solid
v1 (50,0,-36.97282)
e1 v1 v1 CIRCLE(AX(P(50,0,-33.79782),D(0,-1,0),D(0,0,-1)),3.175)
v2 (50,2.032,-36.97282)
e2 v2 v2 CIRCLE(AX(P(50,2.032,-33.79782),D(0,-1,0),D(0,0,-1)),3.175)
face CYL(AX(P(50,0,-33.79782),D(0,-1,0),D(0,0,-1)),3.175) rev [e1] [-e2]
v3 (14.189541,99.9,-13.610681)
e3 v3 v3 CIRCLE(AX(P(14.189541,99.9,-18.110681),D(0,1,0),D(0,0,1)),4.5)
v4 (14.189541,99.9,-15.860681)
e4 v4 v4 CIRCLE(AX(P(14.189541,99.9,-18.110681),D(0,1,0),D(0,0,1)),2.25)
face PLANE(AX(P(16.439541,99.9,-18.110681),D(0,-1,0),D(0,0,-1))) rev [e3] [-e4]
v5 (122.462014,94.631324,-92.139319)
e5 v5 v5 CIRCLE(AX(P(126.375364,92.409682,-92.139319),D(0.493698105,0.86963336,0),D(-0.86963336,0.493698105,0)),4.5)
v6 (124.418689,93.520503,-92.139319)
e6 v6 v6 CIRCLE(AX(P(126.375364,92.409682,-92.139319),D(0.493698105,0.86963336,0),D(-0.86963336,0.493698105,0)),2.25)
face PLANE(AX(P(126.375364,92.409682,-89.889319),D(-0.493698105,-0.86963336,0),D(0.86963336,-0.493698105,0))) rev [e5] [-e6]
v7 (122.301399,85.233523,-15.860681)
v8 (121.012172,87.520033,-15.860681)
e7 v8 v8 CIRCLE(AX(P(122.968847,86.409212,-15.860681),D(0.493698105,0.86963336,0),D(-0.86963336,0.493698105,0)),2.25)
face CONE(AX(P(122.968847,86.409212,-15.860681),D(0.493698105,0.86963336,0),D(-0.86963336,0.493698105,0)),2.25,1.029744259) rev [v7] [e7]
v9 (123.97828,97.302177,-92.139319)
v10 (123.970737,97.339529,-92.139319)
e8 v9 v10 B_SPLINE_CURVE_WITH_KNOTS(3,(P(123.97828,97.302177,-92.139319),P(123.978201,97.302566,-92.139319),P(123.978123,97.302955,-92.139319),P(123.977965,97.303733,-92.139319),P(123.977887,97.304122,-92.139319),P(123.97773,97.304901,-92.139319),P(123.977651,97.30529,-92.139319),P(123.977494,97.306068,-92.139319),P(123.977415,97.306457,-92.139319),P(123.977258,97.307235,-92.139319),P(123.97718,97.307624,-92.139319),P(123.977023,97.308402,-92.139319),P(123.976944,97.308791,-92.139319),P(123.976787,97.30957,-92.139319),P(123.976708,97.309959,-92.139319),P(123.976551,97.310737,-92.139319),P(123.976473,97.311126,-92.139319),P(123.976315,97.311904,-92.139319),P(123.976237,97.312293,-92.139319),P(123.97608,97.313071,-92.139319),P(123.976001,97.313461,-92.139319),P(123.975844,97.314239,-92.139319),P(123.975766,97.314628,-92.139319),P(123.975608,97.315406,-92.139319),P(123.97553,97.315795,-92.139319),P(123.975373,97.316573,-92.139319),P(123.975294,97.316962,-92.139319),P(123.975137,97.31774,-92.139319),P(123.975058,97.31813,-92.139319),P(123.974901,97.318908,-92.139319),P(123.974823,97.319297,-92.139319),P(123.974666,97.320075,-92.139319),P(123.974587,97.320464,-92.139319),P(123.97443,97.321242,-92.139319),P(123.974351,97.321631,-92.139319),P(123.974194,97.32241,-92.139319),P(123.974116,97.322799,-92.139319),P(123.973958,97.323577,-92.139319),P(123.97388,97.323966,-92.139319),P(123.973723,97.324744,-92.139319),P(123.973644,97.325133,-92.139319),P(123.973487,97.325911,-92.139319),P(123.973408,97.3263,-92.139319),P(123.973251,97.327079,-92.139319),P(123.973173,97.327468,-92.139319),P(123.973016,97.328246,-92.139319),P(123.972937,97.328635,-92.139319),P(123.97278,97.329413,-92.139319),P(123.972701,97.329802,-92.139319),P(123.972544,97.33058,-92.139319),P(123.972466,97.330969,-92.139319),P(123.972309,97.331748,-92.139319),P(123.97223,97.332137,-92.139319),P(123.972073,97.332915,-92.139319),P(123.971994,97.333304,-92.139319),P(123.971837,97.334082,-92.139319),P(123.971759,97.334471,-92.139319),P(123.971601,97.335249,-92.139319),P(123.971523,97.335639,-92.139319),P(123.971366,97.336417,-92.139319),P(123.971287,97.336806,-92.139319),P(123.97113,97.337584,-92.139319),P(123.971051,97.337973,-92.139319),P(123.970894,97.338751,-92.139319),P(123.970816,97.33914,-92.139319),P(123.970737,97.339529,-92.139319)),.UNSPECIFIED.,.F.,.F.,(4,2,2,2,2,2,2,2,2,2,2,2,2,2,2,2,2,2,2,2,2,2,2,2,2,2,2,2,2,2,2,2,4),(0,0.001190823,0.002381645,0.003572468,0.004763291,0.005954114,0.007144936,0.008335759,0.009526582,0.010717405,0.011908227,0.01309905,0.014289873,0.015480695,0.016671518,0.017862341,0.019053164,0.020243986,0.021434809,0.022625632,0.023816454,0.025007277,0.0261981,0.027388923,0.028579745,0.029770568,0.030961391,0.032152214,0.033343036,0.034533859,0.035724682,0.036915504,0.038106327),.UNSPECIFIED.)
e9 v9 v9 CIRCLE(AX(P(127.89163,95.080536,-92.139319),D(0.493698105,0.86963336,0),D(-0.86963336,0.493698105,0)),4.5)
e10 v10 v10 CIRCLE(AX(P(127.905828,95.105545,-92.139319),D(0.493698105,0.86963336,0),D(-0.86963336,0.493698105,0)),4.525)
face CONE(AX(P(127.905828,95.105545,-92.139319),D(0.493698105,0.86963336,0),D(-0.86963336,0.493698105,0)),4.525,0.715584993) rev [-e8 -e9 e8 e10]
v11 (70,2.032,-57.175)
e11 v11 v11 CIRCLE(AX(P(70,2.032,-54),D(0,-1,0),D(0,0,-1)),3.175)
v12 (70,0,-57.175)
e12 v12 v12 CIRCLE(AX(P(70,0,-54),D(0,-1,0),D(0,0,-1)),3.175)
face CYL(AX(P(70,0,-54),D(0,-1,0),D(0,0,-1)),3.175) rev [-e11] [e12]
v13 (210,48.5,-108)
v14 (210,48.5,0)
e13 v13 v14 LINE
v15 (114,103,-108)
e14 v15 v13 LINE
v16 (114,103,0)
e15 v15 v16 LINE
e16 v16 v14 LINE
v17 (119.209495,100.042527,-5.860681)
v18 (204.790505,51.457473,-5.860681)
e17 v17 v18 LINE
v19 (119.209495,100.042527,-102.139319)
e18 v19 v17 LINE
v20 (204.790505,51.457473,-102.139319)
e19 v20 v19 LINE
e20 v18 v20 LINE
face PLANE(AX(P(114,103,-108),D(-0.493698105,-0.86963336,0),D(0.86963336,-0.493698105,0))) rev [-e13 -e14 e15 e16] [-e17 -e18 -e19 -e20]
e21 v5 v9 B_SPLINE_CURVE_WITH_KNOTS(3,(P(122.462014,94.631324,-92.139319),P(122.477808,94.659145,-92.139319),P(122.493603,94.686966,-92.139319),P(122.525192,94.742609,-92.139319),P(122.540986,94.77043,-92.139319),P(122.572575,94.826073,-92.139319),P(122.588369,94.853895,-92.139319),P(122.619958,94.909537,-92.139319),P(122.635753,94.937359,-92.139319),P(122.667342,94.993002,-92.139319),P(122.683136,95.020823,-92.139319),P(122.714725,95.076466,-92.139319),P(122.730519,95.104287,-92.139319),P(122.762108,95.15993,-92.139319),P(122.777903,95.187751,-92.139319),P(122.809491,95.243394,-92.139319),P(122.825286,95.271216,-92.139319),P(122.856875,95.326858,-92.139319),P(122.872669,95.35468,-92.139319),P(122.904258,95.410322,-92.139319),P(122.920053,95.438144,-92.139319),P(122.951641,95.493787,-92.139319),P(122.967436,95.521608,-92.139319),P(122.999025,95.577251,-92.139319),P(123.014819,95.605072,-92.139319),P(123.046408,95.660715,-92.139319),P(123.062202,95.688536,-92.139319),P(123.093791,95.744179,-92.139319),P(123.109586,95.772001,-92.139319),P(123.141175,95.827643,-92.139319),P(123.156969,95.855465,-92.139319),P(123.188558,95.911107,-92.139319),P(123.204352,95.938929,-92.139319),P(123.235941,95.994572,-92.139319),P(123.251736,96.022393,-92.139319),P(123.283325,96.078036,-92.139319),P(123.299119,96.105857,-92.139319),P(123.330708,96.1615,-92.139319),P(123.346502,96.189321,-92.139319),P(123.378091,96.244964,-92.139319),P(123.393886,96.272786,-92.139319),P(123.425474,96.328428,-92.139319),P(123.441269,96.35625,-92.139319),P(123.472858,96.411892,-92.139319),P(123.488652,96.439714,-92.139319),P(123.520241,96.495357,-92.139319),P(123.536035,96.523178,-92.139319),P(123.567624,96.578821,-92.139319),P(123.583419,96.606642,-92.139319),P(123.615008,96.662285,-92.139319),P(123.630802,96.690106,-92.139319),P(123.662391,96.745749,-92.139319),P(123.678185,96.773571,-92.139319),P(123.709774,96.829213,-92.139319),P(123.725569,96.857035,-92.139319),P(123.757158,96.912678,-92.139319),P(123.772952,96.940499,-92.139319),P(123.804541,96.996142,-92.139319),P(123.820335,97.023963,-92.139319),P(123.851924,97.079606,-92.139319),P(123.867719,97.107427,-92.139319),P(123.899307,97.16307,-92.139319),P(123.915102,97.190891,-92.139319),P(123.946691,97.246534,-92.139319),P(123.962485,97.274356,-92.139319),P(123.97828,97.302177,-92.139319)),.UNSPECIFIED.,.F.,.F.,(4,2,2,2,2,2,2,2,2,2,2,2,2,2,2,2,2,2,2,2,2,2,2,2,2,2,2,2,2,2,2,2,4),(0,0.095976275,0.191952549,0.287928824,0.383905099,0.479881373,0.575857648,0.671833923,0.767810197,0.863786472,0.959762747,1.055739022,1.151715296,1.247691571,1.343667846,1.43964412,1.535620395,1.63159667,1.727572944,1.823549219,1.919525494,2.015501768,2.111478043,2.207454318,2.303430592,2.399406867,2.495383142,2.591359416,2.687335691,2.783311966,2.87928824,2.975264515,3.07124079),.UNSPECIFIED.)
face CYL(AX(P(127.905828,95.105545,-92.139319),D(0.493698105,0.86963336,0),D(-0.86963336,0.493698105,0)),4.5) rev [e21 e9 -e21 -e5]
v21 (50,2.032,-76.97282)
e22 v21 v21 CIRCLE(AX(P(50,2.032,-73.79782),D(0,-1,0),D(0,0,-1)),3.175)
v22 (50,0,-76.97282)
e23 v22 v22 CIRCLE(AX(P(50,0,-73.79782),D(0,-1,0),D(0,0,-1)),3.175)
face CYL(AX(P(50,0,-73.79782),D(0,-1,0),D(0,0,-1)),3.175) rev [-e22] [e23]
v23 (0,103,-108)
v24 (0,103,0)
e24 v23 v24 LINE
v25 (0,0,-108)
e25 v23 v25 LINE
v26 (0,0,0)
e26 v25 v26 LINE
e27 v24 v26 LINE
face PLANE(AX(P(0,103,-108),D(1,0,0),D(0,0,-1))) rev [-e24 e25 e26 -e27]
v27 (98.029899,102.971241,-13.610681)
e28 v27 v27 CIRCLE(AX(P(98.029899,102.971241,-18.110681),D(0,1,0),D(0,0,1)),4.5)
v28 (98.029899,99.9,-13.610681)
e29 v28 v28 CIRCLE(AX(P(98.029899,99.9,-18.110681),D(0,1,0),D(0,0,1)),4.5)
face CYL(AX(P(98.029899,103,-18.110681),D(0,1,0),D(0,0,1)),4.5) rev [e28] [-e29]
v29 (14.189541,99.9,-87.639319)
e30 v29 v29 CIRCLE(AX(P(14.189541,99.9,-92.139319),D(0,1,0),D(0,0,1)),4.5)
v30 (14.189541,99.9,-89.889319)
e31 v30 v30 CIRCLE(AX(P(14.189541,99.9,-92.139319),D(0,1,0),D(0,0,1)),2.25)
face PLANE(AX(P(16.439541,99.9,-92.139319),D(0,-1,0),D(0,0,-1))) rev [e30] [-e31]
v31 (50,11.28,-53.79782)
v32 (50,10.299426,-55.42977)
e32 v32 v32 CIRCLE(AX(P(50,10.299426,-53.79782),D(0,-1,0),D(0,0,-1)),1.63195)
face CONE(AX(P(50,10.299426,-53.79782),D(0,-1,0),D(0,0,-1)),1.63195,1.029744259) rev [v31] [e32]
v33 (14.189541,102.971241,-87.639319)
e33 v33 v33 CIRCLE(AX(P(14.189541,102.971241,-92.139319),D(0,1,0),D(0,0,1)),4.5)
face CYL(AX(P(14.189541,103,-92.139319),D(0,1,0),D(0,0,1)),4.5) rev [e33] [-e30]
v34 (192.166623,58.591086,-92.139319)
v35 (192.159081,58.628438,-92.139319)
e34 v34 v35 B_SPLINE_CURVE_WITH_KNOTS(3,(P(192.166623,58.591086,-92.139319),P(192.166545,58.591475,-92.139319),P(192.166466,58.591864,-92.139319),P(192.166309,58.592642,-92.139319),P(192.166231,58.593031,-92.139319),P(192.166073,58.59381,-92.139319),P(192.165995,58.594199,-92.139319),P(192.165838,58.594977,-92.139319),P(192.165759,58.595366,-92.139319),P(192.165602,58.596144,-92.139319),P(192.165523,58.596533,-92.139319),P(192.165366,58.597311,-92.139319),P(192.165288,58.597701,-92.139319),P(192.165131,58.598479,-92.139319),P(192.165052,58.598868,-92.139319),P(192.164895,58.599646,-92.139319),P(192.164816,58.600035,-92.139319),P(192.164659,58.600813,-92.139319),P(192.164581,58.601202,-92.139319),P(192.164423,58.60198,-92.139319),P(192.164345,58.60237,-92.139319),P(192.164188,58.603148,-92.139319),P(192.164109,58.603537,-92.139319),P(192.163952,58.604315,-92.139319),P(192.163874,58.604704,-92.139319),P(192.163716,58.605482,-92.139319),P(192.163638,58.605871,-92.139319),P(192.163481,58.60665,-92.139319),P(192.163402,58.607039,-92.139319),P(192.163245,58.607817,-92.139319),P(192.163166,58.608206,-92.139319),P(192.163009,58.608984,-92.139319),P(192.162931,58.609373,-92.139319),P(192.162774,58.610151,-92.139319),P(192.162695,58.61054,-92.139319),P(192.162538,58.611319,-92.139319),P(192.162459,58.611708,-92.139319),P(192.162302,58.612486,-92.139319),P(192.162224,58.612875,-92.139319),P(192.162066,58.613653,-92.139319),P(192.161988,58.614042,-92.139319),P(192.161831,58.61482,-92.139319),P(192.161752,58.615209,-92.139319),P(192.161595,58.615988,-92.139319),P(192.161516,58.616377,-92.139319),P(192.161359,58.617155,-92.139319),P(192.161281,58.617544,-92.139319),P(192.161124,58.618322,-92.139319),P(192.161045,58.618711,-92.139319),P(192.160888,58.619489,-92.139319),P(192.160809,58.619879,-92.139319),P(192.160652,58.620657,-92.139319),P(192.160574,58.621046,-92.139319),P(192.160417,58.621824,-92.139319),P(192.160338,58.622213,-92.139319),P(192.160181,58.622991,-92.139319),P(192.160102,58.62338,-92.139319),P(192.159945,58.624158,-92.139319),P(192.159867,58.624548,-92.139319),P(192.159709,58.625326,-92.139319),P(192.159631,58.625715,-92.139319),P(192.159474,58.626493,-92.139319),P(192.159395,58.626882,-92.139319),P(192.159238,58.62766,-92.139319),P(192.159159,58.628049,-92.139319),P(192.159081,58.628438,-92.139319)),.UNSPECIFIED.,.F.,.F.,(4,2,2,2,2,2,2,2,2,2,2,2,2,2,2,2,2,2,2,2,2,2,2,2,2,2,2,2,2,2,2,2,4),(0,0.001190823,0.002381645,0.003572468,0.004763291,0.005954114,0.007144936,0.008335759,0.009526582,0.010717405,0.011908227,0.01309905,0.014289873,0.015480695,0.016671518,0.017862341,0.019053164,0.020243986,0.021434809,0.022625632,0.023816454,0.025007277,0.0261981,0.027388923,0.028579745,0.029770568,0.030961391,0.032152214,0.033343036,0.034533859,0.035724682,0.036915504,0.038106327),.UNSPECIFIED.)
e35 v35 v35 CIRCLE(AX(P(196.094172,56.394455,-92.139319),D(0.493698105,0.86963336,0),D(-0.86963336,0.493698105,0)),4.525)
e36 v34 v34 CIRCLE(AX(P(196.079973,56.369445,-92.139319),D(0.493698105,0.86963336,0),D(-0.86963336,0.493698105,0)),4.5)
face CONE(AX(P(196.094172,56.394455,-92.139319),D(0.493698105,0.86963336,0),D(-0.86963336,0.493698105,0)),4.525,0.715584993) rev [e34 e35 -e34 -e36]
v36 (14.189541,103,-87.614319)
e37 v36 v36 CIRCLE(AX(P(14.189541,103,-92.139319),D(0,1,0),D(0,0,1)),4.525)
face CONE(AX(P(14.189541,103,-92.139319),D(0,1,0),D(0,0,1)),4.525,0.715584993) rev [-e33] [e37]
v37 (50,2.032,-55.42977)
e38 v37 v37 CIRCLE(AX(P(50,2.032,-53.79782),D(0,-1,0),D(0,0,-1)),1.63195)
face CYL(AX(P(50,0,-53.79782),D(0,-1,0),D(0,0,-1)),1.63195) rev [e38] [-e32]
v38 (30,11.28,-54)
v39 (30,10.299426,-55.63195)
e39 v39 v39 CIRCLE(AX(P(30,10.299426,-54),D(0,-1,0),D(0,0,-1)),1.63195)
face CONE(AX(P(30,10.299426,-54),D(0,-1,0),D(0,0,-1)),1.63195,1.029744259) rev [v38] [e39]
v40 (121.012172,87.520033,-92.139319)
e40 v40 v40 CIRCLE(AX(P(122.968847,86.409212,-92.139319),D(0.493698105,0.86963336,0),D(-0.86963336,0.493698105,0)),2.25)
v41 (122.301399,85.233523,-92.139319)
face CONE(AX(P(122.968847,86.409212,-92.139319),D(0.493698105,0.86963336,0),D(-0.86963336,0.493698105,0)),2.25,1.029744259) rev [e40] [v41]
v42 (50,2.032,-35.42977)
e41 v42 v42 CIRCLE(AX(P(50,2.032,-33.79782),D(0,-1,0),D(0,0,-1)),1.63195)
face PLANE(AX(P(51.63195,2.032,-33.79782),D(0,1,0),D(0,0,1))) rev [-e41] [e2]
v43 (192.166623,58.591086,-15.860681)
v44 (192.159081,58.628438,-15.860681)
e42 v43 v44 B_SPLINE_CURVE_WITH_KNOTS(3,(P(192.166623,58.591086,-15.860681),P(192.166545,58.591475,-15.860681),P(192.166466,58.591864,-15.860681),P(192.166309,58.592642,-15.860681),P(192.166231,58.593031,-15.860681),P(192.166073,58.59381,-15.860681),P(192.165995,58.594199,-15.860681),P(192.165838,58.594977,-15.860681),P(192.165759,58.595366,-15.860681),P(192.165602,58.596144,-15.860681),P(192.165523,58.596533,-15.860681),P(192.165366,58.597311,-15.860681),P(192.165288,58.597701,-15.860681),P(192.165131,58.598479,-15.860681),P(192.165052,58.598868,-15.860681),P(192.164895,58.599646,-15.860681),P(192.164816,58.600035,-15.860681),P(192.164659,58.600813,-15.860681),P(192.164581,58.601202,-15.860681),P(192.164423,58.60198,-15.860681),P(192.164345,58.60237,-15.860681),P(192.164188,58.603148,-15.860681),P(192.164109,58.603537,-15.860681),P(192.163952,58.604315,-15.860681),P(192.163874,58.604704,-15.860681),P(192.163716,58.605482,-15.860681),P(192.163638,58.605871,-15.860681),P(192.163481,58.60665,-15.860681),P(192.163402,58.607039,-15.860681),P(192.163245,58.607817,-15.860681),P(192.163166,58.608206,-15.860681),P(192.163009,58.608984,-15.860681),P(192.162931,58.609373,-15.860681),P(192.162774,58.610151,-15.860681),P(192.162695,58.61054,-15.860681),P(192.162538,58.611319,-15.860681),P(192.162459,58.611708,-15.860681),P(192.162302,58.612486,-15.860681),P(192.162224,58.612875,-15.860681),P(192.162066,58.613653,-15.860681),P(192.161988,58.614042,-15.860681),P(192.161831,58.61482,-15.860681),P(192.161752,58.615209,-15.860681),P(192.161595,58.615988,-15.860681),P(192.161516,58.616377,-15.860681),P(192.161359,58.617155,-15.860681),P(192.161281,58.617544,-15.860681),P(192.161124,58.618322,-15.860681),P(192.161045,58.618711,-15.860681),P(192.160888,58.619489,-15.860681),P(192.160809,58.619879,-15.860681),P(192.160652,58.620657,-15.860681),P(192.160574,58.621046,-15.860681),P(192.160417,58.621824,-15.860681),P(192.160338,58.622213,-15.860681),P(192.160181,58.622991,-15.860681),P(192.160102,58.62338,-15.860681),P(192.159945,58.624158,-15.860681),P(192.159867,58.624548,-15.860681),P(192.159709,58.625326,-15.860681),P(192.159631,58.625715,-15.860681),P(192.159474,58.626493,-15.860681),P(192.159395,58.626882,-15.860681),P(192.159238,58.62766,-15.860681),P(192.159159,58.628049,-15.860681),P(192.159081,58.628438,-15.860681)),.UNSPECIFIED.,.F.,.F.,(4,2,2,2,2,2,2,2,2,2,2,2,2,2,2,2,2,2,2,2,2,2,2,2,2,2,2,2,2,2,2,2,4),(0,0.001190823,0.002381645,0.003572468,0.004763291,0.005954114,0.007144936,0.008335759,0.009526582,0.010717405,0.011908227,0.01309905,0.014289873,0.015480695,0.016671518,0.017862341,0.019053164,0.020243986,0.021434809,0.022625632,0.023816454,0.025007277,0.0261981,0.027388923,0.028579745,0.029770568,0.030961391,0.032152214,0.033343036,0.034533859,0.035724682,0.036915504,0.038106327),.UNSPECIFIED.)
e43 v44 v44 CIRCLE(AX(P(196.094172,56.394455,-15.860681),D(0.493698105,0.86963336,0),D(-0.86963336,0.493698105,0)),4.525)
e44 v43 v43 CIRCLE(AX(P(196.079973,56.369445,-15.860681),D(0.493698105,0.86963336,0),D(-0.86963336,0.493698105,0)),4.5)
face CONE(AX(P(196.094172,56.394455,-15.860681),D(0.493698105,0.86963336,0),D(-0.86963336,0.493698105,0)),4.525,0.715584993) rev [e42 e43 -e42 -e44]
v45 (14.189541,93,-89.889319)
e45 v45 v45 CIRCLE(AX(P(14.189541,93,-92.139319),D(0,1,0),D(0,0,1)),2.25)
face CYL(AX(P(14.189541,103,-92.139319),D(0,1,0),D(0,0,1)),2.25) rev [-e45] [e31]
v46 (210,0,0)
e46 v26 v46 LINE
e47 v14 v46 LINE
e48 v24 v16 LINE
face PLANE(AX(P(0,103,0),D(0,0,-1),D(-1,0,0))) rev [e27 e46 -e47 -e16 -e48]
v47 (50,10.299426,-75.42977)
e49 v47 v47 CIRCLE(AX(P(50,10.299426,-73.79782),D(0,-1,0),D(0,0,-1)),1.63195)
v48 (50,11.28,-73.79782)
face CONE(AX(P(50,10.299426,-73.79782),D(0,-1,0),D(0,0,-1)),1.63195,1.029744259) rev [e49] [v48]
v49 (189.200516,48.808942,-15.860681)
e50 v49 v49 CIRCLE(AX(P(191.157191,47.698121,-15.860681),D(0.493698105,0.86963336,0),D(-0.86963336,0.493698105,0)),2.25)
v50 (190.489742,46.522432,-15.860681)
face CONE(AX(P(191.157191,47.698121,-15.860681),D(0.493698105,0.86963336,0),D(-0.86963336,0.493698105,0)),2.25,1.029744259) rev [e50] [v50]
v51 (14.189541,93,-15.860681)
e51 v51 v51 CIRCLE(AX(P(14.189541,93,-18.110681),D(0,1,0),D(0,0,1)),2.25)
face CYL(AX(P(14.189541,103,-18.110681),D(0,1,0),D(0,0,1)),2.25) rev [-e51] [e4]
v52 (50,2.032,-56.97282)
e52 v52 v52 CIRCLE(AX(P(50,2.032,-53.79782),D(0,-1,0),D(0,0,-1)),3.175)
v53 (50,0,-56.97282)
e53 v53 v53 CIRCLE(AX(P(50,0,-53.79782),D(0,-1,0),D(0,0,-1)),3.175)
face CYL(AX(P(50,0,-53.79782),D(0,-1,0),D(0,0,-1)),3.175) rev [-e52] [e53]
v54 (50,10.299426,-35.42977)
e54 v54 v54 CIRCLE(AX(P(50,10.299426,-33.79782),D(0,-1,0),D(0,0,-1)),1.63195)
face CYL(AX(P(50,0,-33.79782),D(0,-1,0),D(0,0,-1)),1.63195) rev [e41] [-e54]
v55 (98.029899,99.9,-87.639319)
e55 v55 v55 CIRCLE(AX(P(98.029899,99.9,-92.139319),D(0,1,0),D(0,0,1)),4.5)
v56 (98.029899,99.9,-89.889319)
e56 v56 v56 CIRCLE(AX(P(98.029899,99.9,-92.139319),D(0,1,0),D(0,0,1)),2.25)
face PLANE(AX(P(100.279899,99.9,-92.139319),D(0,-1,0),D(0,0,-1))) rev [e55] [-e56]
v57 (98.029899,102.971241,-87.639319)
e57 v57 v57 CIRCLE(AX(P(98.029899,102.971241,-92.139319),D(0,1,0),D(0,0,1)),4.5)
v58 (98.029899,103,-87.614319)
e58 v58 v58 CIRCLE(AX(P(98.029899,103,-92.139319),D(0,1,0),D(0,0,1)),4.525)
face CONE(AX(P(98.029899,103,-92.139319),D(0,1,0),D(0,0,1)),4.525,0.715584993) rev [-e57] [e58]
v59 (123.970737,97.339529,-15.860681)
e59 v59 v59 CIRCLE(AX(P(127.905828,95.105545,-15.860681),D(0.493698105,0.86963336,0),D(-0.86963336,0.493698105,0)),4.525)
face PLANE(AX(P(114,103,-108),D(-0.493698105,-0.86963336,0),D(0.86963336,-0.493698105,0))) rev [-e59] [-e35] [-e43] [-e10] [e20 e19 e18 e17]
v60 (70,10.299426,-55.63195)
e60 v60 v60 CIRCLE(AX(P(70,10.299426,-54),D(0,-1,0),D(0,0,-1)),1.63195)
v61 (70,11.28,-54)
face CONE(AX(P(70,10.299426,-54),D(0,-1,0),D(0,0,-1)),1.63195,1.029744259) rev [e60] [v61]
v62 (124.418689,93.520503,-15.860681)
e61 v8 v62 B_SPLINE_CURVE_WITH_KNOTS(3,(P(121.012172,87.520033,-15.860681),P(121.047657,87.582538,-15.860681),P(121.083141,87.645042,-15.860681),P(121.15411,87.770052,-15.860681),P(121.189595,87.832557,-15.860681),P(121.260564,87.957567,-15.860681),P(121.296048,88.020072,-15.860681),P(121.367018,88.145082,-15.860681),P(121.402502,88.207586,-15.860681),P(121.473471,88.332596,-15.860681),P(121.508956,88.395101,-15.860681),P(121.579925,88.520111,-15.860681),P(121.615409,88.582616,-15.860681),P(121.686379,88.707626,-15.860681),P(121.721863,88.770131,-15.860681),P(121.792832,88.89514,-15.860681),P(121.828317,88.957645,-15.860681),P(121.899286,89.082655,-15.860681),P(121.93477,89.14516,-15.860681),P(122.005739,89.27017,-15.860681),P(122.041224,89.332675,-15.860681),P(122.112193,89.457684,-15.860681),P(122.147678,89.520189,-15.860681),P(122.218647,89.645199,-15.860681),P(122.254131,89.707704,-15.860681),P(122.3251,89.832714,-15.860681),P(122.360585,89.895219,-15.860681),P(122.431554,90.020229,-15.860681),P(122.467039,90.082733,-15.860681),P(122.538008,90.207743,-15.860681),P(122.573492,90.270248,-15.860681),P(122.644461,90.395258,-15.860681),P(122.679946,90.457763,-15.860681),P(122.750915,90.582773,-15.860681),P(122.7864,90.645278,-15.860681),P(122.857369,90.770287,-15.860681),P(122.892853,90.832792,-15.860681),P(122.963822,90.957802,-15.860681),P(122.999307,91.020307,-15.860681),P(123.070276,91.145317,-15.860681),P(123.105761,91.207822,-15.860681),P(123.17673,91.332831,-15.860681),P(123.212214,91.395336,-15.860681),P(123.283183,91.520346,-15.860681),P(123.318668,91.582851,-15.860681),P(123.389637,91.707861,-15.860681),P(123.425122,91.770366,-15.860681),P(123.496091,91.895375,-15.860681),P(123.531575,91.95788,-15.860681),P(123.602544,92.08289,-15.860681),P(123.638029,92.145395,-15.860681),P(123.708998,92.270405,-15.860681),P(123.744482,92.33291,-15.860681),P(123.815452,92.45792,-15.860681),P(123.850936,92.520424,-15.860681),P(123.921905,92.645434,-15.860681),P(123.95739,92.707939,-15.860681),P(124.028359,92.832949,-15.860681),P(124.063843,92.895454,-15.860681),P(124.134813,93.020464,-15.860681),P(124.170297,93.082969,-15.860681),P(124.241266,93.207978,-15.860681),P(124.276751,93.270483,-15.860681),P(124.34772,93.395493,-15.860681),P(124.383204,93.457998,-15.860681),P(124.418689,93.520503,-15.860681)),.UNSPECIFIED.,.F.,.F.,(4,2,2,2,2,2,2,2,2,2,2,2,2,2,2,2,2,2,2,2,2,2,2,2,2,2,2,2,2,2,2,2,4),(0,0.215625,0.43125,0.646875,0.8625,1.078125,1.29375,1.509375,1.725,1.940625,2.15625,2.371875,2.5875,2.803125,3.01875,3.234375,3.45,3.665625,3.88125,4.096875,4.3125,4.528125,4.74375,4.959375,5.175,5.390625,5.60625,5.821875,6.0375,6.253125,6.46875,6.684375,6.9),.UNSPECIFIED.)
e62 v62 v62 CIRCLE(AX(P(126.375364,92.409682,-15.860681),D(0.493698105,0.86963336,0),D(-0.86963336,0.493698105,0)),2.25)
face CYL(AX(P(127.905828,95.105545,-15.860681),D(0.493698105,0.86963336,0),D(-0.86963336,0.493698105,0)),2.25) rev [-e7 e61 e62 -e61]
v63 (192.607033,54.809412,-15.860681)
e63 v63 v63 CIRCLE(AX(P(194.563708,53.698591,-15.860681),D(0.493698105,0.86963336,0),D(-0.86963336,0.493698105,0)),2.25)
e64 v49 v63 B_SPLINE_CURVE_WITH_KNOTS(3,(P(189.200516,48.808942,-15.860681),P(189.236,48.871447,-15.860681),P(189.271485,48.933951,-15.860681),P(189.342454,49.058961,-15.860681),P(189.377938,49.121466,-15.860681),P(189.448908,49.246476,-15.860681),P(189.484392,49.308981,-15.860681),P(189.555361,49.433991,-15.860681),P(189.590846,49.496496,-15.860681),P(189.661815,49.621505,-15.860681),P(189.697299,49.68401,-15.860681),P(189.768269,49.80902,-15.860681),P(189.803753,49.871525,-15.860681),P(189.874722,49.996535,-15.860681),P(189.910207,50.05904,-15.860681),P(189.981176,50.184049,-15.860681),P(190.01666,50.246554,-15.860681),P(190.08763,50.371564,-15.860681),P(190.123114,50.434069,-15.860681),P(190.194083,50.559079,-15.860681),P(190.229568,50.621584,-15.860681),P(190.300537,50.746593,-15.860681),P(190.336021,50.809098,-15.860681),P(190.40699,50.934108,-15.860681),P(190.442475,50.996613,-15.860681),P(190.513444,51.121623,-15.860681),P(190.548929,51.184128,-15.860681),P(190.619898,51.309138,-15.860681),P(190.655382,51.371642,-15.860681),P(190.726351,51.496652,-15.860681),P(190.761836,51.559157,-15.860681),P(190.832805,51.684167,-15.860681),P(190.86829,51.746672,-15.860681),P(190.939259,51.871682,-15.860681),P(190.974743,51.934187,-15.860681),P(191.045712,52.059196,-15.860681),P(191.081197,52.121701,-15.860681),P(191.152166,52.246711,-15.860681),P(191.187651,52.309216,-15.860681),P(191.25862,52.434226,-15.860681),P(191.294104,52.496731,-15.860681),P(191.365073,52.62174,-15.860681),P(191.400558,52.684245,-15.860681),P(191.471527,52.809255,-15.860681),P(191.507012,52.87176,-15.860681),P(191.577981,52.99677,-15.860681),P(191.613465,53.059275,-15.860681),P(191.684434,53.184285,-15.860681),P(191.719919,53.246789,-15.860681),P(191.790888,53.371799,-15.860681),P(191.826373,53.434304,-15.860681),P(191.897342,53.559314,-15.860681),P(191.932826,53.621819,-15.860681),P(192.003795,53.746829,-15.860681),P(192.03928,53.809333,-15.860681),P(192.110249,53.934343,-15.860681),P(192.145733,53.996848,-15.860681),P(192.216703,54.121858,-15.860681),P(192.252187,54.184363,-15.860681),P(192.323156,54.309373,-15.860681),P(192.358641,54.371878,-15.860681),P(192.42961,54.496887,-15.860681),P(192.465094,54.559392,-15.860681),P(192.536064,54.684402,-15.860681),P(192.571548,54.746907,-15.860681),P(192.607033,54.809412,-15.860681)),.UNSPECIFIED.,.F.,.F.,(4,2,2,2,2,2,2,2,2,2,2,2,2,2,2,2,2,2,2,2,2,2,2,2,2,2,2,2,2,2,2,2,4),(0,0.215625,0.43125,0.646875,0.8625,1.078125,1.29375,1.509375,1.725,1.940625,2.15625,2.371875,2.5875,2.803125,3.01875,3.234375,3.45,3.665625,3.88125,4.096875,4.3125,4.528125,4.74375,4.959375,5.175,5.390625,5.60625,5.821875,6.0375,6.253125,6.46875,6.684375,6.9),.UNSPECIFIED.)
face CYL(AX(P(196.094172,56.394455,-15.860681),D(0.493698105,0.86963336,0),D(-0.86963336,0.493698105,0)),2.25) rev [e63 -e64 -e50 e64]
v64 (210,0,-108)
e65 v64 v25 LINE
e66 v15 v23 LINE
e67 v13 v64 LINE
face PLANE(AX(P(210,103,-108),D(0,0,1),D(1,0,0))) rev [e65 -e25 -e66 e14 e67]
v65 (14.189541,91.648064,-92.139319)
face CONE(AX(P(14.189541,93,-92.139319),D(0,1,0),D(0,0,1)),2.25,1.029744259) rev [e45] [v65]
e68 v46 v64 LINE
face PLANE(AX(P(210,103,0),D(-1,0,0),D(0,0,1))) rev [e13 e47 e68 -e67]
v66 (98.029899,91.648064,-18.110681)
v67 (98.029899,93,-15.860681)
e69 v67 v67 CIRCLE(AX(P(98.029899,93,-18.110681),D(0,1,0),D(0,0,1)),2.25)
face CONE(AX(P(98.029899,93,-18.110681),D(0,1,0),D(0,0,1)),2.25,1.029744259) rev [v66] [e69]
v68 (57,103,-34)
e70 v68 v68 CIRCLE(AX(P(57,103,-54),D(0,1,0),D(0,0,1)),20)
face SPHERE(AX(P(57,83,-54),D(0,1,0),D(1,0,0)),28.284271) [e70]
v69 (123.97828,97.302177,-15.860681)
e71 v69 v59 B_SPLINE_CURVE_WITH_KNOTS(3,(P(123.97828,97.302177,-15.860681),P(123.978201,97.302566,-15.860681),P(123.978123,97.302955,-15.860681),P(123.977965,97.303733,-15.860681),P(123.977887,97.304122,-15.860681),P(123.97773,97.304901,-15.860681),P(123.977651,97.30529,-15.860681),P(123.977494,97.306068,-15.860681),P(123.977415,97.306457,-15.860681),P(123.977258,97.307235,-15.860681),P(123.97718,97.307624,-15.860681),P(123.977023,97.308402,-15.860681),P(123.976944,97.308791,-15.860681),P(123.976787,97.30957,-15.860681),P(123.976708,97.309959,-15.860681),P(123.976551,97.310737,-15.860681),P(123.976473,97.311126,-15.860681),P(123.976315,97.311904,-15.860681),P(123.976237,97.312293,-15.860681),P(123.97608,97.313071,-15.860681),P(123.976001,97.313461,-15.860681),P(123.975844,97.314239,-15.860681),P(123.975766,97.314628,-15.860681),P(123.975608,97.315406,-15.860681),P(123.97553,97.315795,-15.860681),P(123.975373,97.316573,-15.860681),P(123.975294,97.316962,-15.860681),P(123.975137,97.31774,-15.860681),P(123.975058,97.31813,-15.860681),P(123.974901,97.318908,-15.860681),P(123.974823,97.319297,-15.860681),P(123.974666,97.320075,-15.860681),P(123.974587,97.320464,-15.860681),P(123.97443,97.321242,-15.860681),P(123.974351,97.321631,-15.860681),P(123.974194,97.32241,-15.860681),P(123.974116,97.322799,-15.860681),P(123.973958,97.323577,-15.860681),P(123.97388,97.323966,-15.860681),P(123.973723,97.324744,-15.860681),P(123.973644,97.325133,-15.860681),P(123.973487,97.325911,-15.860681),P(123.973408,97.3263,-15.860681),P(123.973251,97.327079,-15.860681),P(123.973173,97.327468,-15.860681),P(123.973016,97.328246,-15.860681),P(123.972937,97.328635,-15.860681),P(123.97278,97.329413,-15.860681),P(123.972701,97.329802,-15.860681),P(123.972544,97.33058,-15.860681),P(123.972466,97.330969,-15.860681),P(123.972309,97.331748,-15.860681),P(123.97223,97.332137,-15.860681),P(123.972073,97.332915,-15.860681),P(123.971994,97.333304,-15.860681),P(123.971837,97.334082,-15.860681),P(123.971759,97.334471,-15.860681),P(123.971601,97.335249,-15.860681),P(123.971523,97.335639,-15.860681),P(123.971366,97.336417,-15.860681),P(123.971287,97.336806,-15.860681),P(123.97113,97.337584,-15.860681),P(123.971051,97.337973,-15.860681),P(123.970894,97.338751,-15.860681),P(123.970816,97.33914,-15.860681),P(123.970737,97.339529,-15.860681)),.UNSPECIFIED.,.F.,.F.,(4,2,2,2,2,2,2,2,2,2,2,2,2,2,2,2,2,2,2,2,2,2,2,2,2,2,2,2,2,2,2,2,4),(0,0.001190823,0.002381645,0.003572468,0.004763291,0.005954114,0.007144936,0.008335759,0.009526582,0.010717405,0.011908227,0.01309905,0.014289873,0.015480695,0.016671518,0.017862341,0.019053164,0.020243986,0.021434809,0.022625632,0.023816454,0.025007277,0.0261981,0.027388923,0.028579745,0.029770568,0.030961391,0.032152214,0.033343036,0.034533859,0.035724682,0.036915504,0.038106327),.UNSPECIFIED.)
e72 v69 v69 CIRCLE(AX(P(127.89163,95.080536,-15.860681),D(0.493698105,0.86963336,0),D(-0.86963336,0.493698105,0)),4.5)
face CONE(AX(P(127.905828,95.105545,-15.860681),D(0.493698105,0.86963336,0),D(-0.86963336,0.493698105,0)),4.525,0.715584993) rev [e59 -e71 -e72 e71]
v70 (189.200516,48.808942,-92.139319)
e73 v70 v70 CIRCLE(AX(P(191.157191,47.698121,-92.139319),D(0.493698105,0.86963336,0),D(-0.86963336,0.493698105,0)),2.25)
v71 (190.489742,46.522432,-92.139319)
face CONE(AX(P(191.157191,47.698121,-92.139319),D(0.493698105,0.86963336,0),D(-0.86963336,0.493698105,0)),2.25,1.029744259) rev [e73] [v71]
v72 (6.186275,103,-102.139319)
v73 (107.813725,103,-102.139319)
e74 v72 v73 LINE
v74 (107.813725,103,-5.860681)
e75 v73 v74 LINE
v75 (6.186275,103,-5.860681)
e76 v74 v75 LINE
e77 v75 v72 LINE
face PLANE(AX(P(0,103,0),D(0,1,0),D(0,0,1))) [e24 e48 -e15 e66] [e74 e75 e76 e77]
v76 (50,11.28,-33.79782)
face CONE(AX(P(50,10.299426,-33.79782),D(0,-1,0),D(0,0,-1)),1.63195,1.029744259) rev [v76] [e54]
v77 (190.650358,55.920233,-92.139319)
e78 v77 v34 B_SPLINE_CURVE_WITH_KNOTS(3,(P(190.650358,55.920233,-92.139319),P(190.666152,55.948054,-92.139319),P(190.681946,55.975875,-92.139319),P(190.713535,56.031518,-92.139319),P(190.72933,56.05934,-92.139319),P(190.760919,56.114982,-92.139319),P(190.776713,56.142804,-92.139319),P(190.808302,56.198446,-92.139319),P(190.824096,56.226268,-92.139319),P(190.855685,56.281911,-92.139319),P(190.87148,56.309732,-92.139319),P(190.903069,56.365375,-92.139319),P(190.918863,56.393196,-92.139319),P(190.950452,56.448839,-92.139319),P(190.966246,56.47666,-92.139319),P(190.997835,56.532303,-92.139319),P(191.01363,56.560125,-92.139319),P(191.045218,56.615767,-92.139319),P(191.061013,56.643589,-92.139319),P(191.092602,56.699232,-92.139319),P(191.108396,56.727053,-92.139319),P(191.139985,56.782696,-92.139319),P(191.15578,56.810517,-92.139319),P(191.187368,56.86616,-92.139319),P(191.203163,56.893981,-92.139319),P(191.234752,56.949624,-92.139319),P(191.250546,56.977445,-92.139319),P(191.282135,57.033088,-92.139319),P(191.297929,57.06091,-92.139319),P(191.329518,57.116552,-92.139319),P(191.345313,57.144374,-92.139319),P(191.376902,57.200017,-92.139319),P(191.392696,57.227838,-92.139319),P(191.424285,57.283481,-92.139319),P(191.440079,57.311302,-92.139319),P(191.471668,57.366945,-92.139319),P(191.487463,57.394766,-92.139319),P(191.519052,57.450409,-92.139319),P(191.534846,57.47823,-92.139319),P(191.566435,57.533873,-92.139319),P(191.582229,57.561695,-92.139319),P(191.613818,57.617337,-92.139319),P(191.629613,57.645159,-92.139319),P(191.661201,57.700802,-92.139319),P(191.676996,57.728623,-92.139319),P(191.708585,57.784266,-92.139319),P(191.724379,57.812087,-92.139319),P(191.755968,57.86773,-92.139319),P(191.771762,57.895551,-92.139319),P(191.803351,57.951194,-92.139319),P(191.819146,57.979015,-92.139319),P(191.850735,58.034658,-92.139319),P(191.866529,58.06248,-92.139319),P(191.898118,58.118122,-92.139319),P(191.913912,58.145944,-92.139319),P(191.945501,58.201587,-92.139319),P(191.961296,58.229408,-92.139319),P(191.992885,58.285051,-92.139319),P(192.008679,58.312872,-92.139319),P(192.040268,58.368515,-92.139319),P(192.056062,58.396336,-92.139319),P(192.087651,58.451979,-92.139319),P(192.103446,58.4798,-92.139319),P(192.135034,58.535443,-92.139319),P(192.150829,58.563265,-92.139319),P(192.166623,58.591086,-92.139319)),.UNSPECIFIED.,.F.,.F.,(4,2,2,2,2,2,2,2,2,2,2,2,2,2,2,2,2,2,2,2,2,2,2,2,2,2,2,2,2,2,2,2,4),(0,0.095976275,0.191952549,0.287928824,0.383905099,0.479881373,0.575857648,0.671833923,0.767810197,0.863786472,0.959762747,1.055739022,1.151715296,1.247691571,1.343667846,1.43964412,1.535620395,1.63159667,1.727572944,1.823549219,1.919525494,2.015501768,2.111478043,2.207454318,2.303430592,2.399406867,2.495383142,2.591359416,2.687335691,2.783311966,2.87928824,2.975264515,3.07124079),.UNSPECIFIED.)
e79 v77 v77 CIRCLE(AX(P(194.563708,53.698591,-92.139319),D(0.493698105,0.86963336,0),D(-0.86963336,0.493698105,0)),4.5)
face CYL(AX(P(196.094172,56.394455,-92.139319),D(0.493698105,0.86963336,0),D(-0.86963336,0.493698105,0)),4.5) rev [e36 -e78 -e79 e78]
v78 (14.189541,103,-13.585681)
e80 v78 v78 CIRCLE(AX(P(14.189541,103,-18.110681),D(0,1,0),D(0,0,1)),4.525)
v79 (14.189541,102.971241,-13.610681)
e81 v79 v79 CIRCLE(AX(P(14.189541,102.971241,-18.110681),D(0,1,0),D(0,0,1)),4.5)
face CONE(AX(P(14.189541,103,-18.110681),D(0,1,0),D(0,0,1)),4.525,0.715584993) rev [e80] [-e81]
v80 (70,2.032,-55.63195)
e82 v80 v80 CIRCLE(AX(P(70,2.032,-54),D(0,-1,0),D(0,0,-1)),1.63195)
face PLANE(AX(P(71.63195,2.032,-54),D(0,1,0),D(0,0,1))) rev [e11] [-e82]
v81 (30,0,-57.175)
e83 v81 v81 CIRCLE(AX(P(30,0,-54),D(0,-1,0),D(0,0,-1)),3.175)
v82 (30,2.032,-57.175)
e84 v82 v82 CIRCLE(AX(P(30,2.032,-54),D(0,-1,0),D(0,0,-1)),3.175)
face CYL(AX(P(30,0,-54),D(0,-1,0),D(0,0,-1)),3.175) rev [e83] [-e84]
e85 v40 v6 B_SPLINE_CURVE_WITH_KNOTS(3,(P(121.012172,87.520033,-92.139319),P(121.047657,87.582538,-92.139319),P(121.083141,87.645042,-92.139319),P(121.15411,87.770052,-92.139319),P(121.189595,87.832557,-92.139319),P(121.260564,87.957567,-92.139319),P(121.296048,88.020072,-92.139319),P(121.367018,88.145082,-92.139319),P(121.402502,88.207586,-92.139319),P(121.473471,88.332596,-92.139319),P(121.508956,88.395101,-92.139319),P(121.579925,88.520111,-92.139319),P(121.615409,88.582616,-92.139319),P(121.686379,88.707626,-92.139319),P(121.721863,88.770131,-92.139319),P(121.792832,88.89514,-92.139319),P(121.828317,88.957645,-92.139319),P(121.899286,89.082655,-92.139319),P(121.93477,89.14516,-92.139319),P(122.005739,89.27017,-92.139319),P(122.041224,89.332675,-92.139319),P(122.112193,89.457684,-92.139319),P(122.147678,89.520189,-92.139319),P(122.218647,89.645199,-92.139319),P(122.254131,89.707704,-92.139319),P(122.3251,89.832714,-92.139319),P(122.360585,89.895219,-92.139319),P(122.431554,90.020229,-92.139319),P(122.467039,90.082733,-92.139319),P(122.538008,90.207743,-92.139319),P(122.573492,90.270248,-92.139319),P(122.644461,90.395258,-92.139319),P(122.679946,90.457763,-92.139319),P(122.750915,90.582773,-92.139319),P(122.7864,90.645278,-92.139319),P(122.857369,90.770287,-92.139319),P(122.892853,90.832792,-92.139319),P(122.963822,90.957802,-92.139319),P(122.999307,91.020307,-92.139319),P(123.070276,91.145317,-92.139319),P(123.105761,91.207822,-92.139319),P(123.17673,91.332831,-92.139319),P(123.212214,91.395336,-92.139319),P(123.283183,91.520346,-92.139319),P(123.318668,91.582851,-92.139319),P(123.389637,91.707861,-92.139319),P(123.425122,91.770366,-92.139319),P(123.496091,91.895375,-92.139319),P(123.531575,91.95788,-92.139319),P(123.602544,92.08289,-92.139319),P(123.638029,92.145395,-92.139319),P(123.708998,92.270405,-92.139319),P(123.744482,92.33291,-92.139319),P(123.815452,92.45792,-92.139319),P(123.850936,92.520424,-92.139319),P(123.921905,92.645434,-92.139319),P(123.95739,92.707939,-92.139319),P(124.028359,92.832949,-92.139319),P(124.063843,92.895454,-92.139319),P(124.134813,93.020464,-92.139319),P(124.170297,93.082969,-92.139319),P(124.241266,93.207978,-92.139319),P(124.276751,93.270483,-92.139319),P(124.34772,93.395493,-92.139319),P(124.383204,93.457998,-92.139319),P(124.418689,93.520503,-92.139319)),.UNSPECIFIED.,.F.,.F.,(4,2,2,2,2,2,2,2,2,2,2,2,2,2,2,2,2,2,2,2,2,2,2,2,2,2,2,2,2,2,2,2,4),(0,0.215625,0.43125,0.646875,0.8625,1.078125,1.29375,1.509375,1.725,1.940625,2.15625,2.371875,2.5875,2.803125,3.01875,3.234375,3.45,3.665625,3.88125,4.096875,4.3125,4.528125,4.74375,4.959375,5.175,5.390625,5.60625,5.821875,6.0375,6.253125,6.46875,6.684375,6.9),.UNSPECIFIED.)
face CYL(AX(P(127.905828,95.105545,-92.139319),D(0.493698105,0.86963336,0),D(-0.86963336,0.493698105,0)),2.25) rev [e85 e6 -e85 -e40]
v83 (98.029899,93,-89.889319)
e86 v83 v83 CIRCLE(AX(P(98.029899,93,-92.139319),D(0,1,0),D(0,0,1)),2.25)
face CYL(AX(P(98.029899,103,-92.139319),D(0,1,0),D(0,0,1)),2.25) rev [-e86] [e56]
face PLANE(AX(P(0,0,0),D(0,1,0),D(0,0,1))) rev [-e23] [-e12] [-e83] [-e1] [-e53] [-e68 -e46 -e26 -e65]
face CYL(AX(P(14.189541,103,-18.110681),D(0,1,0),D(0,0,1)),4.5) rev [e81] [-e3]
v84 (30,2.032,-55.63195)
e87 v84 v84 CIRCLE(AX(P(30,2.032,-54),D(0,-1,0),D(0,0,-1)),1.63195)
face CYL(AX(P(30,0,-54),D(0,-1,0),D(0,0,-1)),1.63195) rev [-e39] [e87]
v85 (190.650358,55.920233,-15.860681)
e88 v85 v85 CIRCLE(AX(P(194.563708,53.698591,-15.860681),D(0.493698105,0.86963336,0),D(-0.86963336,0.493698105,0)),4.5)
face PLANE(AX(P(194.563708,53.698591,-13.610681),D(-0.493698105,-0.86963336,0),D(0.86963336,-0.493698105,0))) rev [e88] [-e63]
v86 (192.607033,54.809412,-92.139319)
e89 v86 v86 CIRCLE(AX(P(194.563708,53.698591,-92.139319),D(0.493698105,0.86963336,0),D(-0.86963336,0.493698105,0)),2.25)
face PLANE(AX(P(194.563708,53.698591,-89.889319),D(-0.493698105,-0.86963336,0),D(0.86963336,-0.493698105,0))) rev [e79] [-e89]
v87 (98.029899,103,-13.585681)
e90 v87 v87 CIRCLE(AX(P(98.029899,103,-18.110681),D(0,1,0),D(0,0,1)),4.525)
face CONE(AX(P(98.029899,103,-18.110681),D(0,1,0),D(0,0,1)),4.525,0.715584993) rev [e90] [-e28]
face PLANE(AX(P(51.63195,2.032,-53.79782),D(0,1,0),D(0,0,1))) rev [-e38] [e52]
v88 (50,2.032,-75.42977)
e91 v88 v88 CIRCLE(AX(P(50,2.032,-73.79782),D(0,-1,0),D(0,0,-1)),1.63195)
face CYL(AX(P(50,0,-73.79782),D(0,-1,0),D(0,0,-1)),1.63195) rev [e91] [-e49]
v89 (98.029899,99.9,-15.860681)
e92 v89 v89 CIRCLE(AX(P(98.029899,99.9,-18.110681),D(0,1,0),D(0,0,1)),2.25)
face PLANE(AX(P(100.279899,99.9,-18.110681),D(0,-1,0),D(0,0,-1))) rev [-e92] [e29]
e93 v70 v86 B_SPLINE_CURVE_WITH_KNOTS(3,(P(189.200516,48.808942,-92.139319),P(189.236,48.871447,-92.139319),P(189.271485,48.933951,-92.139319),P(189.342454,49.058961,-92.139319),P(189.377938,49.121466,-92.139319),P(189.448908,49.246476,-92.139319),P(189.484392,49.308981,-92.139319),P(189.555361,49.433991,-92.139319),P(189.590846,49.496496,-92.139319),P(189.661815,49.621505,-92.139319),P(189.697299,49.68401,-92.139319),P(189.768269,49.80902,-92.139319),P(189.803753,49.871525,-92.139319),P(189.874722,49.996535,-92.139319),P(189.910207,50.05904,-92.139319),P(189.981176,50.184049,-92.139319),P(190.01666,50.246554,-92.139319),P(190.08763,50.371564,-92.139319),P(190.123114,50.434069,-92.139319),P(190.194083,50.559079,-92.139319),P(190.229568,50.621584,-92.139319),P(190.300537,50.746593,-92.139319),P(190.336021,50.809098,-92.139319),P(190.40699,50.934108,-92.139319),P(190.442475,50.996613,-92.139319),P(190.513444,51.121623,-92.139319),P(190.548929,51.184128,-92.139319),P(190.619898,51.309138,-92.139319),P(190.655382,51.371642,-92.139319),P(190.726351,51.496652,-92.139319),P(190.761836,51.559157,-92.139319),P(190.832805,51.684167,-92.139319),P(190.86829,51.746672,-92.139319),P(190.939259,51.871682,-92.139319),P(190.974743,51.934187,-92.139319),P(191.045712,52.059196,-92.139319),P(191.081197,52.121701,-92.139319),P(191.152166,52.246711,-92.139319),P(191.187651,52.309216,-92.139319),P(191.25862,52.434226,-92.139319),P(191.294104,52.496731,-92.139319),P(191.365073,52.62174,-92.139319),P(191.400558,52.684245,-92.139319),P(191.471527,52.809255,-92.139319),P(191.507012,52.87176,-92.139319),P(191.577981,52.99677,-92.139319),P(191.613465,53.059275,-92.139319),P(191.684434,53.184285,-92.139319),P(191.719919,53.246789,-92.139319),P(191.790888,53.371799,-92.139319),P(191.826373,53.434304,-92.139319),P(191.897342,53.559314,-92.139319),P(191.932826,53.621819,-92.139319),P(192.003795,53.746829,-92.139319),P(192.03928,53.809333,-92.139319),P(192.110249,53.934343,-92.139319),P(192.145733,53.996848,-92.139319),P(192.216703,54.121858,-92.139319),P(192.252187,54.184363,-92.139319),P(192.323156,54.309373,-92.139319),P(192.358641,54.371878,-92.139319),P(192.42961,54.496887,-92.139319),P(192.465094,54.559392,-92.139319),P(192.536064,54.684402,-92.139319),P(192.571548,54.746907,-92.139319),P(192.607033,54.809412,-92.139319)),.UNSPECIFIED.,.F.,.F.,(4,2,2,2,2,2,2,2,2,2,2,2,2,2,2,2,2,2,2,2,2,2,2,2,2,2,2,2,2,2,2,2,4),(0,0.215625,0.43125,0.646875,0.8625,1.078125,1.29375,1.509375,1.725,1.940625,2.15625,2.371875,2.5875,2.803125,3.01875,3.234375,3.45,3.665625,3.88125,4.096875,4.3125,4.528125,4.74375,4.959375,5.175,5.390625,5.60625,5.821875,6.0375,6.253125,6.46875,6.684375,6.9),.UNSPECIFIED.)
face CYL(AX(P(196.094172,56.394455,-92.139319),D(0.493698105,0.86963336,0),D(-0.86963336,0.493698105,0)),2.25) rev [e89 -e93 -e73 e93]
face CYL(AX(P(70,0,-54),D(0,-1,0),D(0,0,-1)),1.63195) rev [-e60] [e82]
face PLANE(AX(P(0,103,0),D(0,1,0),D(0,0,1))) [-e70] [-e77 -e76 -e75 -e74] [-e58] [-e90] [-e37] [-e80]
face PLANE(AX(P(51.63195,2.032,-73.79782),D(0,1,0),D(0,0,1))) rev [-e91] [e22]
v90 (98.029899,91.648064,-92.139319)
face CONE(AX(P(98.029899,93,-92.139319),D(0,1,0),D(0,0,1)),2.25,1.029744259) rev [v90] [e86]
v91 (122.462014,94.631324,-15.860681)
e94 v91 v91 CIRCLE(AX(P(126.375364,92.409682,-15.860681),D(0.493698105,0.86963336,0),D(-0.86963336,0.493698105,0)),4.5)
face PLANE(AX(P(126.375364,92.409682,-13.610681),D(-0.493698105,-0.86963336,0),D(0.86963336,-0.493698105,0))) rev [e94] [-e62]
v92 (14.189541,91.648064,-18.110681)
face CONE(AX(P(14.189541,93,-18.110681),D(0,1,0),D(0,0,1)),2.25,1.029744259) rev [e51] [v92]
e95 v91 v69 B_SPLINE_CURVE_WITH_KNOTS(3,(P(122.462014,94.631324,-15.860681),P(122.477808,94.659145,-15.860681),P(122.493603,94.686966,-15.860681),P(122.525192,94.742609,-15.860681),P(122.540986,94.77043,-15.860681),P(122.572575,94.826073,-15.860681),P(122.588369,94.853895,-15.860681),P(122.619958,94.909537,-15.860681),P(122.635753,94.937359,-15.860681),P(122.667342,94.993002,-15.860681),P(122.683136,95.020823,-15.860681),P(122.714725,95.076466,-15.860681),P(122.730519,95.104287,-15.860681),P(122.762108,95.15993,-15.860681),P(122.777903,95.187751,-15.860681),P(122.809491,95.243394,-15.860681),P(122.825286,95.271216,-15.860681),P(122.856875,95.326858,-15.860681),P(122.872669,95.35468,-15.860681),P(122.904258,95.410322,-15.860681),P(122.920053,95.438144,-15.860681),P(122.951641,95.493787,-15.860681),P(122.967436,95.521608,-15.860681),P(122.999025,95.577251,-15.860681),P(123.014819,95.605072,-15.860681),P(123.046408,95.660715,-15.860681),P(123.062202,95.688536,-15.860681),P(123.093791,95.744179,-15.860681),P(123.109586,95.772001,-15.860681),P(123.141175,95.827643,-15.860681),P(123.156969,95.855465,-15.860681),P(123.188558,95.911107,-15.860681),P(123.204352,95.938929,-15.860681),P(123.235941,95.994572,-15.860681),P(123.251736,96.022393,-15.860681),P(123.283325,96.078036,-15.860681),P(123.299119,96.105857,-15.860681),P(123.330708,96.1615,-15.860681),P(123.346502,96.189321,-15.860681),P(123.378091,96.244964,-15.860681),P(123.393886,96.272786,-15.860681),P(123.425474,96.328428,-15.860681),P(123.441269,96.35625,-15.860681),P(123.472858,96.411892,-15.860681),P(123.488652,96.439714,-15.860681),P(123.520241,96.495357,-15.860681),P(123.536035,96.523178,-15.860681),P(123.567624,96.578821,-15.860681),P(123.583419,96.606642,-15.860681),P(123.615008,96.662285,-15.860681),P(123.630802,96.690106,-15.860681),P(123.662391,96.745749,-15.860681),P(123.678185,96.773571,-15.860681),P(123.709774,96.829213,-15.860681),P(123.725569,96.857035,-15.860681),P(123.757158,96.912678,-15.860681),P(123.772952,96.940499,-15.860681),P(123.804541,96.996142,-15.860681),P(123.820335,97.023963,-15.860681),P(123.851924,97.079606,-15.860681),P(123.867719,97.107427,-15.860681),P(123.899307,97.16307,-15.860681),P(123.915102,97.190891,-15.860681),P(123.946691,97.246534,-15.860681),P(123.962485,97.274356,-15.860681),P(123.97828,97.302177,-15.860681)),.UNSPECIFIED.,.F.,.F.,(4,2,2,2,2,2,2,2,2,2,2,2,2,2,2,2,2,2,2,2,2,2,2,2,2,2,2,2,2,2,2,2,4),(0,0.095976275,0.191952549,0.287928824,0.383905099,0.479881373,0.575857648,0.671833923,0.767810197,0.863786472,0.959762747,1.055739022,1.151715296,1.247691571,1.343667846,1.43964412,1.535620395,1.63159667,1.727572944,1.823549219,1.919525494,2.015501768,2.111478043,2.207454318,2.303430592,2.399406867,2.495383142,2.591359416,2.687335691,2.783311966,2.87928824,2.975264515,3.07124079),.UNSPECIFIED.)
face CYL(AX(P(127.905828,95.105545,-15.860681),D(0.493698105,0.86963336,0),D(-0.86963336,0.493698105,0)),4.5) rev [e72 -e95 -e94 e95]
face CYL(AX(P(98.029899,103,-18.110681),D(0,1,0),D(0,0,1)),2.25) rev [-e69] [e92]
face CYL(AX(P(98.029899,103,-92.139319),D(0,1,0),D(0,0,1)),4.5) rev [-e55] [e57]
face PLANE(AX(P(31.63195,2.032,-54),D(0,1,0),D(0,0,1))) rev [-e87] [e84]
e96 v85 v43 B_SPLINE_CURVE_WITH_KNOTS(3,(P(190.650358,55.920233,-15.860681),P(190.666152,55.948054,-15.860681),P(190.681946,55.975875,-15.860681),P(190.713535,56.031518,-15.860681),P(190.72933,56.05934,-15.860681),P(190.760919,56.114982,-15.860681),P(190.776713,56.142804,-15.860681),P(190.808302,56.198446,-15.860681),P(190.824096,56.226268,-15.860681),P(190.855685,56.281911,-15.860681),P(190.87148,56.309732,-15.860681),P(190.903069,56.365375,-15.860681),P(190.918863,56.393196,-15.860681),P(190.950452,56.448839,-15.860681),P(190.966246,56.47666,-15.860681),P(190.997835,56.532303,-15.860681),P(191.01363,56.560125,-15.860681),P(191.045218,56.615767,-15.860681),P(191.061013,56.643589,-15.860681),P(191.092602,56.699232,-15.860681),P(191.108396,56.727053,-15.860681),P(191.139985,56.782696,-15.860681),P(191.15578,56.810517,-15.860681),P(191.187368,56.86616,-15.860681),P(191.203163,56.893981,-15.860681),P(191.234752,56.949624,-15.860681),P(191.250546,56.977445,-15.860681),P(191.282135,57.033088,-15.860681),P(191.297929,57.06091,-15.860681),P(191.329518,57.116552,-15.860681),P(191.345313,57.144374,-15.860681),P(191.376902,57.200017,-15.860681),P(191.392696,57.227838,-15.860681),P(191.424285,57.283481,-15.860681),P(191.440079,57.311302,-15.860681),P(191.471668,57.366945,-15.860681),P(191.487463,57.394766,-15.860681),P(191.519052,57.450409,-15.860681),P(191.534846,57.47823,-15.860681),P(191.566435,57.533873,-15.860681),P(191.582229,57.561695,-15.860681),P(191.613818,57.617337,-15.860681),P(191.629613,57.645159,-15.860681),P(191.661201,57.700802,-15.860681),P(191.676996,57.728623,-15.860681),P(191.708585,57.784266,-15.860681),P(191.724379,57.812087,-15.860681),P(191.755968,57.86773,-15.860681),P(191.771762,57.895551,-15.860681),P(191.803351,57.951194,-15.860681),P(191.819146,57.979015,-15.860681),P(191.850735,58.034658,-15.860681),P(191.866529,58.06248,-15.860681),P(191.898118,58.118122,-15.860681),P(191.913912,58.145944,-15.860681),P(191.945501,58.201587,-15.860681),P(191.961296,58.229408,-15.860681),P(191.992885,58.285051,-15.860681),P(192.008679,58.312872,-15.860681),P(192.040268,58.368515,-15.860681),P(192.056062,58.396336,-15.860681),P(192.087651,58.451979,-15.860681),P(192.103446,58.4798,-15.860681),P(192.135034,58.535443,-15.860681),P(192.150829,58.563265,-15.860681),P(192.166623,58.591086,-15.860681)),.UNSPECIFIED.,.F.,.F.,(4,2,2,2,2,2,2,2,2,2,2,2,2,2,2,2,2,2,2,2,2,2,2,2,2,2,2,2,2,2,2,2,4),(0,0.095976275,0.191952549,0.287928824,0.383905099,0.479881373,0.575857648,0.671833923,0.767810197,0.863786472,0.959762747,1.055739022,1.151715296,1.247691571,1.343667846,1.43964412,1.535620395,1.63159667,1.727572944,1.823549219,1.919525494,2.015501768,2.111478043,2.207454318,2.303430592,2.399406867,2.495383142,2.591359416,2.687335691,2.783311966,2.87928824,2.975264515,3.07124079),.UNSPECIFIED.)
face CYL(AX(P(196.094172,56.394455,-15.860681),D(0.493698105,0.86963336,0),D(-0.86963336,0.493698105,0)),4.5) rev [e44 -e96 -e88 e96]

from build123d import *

# Parameters (mm, degrees)
CROQUIS1_W                                     = 210
CROQUIS1_H                                     = 108
SALIENTE_EXTRUIR1_DEPTH                        = 103
CORTAR_EXTRUIR2_DEPTH                          = 108
REFRENTADO_PARA_TORNILLO_CON_CABEZA_2_COUNT    = 2
REFRENTADO_PARA_TORNILLO_CON_CABEZA_2_PITCH    = 76.278637259
REFRENTADO_PARA_TORNILLO_CON_CABEZA_3_COUNT    = 2
REFRENTADO_PARA_TORNILLO_CON_CABEZA_3_PITCH    = 109.392089664
REFRENTADO_PARA_TORNILLO_CON_CABEZA_4_COUNT    = 2
REFRENTADO_PARA_TORNILLO_CON_CABEZA_4_PITCH    = 78.410450701
REFRENTADO_PARA_TORNILLO_CON_CABEZA_5_AT_COUNT = 2
REFRENTADO_PARA_TORNILLO_CON_CABEZA_5_AT_PITCH = 74.028637259
REFRENTADO_PARA_TORNILLO_CON_CABEZA_6_COUNT    = 2
REFRENTADO_PARA_TORNILLO_CON_CABEZA_6_PITCH    = 111.845629414
REFRENTADO_PARA_TORNILLO_CON_CABEZA_7_COUNT    = 2
REFRENTADO_PARA_TORNILLO_CON_CABEZA_7_PITCH    = 83.840358328


# Read off the part's stored shape, not the designer's step: Refrentado para tornillo con cabeza troncocónica de #43
with BuildPart() as part:
    # Croquis1 → Saliente-Extruir1 (new body)
    with BuildSketch(Plane(origin=(0, 0, 0), x_dir=(1, 0, 0), z_dir=(0, 1, 0))):
        with Locations((105, 54)):
            Rectangle(CROQUIS1_W, CROQUIS1_H)
    extrude(amount=SALIENTE_EXTRUIR1_DEPTH)

    # Croquis2 → Cortar-Extruir2 (cut)
    with BuildSketch(Plane.XY):
        Polygon((114, 103), (210, 48.5), (210, 103), align=None)
    extrude(amount=-CORTAR_EXTRUIR2_DEPTH, mode=Mode.SUBTRACT)

    # Croquis11 → Revolución11 (revolve)
    with BuildSketch(Plane(origin=(0, 0, -54), x_dir=(-1, 0, 0), z_dir=(0, 0, -1))):
        with BuildLine():
            Line((-57, 103), (-57, 111.284271247))
            ThreePointArc((-57, 111.284271247), (-67.823922003, 109.131259298), (-77, 103))
            Line((-77, 103), (-57, 103))
        make_face()
    revolve(axis=Axis((57, 132.747407407, -54), (0, -1, 0)))

    # Croquis23 → Refrentado para tornillo con cabeza tron (revolve, cut)
    with BuildSketch(Plane(origin=(196.094171849, 56.394454523, -92.139318629), x_dir=(-0.8696333599491718, 0.49369810538781117, 0), z_dir=(0, 0, 1))):
        Polygon((0, 0), (0, 11.351936393), (2.25, 10), (2.25, 3.1), (4.5, 3.1), (4.5, 0.02875921), (4.525, 0), align=None)
    refrentado_para_tornillo_con_cabeza_tron = revolve(axis=Axis((199.229154818, 61.916626359, -92.139318629), (-0.4936981053878111, -0.8696333599491718, 0)), mode=Mode.SUBTRACT)

    # Refrentado para tornillo con cabeza  2: Refrentado para tornillo con cabeza tron ×2
    with Locations(*[(0, 0, i * REFRENTADO_PARA_TORNILLO_CON_CABEZA_2_PITCH) for i in range(1, REFRENTADO_PARA_TORNILLO_CON_CABEZA_2_COUNT)]):
        add(refrentado_para_tornillo_con_cabeza_tron, mode=Mode.SUBTRACT)

    # Refrentado para tornillo con cabeza  3: Refrentado para tornillo con cabeza tron ×2
    with Locations(*[Vector(-0.6233388895581213, 0.35387468209289175, 0.6972957321955321) * (i * REFRENTADO_PARA_TORNILLO_CON_CABEZA_3_PITCH) for i in range(1, REFRENTADO_PARA_TORNILLO_CON_CABEZA_3_COUNT)]):
        add(refrentado_para_tornillo_con_cabeza_tron, mode=Mode.SUBTRACT)

    # Refrentado para tornillo con cabeza  4: Refrentado para tornillo con cabeza tron ×2
    with Locations(*[Vector(-0.8696333599491719, 0.49369810538781106, 0) * (i * REFRENTADO_PARA_TORNILLO_CON_CABEZA_4_PITCH) for i in range(1, REFRENTADO_PARA_TORNILLO_CON_CABEZA_4_COUNT)]):
        add(refrentado_para_tornillo_con_cabeza_tron, mode=Mode.SUBTRACT)

    # Croquis26 → Refrentado para tornillo con cabeza  5 (revolve, cut)
    with BuildSketch(Plane(origin=(98.029898951, 103, -92.139318629), x_dir=(0, 0, 1), z_dir=(1, 0, 0))):
        Polygon((0, 0), (0, 11.351936393), (2.25, 10), (2.25, 3.1), (4.5, 3.1), (4.5, 0.02875921), (4.525, 0), align=None)
    refrentado_para_tornillo_con_cabeza_5 = revolve(axis=Axis((98.029898951, 109.35, -92.139318629), (0, -1, 0)), mode=Mode.SUBTRACT)

    # Refrentado para tornillo con cabeza 5 at: Refrentado para tornillo con cabeza  5 ×2
    with Locations(*[(0, 0, i * REFRENTADO_PARA_TORNILLO_CON_CABEZA_5_AT_PITCH) for i in range(1, REFRENTADO_PARA_TORNILLO_CON_CABEZA_5_AT_COUNT)]):
        add(refrentado_para_tornillo_con_cabeza_5, mode=Mode.SUBTRACT)

    # Refrentado para tornillo con cabeza  6: Refrentado para tornillo con cabeza  5 ×2
    with Locations(*[Vector(-0.7496078189874714, 0, 0.6618822536621196) * (i * REFRENTADO_PARA_TORNILLO_CON_CABEZA_6_PITCH) for i in range(1, REFRENTADO_PARA_TORNILLO_CON_CABEZA_6_COUNT)]):
        add(refrentado_para_tornillo_con_cabeza_5, mode=Mode.SUBTRACT)

    # Refrentado para tornillo con cabeza  7: Refrentado para tornillo con cabeza  5 ×2
    with Locations(*[(-i * REFRENTADO_PARA_TORNILLO_CON_CABEZA_7_PITCH, 0, 0) for i in range(1, REFRENTADO_PARA_TORNILLO_CON_CABEZA_7_COUNT)]):
        add(refrentado_para_tornillo_con_cabeza_5, mode=Mode.SUBTRACT)

    # Refrentado para tornillo con cabeza 8 ou → Refrentado para tornillo con cabeza  8 (revolve, cut)
    with BuildSketch(Plane(origin=(70, 0, -54), x_dir=(1, 0, 0), z_dir=(0, 0, 1))):
        Polygon((1.63195, 10.299425513), (0, 11.28), (0, 0), (3.175, 0), (3.175, 2.032), (1.63195, 2.032), align=None)
    revolve(axis=Axis((70, 0, -54), (0, 1, 0)), mode=Mode.SUBTRACT)

    # Refrentado para tornillo con cabeza  9 → Refrentado para tornillo con cabeza 8 2 (revolve, cut)
    with BuildSketch(Plane(origin=(50, 0, -73.797820485), x_dir=(1, 0, 0), z_dir=(0, 0, 1))):
        Polygon((0, 0), (3.175, 0), (3.175, 2.032), (1.63195, 2.032), (1.63195, 10.299425513), (0, 11.28), align=None)
    revolve(axis=Axis((50, 0, -73.797820485), (0, 1, 0)), mode=Mode.SUBTRACT)

    # Refrentado para tornillo con cabeza  10 → Refrentado para tornillo con cabeza 8 3 (revolve, cut)
    with BuildSketch(Plane(origin=(50, 0, -33.797820485), x_dir=(1, 0, 0), z_dir=(0, 0, 1))):
        Polygon((0, 0), (3.175, 0), (3.175, 2.032), (1.63195, 2.032), (1.63195, 10.299425513), (0, 11.28), align=None)
    revolve(axis=Axis((50, 0, -33.797820485), (0, 1, 0)), mode=Mode.SUBTRACT)

    # Refrentado para tornillo con cabeza  11 → Refrentado para tornillo con cabeza 8 4 (revolve, cut)
    with BuildSketch(Plane(origin=(50, 0, -53.797820485), x_dir=(1, 0, 0), z_dir=(0, 0, 1))):
        Polygon((0, 0), (3.175, 0), (3.175, 2.032), (1.63195, 2.032), (1.63195, 10.299425513), (0, 11.28), align=None)
    revolve(axis=Axis((50, 0, -53.797820485), (0, 1, 0)), mode=Mode.SUBTRACT)

    # Refrentado para tornillo con cabeza  12 → Refrentado para tornillo con cabeza 8 5 (revolve, cut)
    with BuildSketch(Plane(origin=(30, 0, -54), x_dir=(1, 0, 0), z_dir=(0, 0, 1))):
        Polygon((0, 0), (3.175, 0), (3.175, 2.032), (1.63195, 2.032), (1.63195, 10.299425513), (0, 11.28), align=None)
    revolve(axis=Axis((30, 0, -54), (0, 1, 0)), mode=Mode.SUBTRACT)


solid = part.part
